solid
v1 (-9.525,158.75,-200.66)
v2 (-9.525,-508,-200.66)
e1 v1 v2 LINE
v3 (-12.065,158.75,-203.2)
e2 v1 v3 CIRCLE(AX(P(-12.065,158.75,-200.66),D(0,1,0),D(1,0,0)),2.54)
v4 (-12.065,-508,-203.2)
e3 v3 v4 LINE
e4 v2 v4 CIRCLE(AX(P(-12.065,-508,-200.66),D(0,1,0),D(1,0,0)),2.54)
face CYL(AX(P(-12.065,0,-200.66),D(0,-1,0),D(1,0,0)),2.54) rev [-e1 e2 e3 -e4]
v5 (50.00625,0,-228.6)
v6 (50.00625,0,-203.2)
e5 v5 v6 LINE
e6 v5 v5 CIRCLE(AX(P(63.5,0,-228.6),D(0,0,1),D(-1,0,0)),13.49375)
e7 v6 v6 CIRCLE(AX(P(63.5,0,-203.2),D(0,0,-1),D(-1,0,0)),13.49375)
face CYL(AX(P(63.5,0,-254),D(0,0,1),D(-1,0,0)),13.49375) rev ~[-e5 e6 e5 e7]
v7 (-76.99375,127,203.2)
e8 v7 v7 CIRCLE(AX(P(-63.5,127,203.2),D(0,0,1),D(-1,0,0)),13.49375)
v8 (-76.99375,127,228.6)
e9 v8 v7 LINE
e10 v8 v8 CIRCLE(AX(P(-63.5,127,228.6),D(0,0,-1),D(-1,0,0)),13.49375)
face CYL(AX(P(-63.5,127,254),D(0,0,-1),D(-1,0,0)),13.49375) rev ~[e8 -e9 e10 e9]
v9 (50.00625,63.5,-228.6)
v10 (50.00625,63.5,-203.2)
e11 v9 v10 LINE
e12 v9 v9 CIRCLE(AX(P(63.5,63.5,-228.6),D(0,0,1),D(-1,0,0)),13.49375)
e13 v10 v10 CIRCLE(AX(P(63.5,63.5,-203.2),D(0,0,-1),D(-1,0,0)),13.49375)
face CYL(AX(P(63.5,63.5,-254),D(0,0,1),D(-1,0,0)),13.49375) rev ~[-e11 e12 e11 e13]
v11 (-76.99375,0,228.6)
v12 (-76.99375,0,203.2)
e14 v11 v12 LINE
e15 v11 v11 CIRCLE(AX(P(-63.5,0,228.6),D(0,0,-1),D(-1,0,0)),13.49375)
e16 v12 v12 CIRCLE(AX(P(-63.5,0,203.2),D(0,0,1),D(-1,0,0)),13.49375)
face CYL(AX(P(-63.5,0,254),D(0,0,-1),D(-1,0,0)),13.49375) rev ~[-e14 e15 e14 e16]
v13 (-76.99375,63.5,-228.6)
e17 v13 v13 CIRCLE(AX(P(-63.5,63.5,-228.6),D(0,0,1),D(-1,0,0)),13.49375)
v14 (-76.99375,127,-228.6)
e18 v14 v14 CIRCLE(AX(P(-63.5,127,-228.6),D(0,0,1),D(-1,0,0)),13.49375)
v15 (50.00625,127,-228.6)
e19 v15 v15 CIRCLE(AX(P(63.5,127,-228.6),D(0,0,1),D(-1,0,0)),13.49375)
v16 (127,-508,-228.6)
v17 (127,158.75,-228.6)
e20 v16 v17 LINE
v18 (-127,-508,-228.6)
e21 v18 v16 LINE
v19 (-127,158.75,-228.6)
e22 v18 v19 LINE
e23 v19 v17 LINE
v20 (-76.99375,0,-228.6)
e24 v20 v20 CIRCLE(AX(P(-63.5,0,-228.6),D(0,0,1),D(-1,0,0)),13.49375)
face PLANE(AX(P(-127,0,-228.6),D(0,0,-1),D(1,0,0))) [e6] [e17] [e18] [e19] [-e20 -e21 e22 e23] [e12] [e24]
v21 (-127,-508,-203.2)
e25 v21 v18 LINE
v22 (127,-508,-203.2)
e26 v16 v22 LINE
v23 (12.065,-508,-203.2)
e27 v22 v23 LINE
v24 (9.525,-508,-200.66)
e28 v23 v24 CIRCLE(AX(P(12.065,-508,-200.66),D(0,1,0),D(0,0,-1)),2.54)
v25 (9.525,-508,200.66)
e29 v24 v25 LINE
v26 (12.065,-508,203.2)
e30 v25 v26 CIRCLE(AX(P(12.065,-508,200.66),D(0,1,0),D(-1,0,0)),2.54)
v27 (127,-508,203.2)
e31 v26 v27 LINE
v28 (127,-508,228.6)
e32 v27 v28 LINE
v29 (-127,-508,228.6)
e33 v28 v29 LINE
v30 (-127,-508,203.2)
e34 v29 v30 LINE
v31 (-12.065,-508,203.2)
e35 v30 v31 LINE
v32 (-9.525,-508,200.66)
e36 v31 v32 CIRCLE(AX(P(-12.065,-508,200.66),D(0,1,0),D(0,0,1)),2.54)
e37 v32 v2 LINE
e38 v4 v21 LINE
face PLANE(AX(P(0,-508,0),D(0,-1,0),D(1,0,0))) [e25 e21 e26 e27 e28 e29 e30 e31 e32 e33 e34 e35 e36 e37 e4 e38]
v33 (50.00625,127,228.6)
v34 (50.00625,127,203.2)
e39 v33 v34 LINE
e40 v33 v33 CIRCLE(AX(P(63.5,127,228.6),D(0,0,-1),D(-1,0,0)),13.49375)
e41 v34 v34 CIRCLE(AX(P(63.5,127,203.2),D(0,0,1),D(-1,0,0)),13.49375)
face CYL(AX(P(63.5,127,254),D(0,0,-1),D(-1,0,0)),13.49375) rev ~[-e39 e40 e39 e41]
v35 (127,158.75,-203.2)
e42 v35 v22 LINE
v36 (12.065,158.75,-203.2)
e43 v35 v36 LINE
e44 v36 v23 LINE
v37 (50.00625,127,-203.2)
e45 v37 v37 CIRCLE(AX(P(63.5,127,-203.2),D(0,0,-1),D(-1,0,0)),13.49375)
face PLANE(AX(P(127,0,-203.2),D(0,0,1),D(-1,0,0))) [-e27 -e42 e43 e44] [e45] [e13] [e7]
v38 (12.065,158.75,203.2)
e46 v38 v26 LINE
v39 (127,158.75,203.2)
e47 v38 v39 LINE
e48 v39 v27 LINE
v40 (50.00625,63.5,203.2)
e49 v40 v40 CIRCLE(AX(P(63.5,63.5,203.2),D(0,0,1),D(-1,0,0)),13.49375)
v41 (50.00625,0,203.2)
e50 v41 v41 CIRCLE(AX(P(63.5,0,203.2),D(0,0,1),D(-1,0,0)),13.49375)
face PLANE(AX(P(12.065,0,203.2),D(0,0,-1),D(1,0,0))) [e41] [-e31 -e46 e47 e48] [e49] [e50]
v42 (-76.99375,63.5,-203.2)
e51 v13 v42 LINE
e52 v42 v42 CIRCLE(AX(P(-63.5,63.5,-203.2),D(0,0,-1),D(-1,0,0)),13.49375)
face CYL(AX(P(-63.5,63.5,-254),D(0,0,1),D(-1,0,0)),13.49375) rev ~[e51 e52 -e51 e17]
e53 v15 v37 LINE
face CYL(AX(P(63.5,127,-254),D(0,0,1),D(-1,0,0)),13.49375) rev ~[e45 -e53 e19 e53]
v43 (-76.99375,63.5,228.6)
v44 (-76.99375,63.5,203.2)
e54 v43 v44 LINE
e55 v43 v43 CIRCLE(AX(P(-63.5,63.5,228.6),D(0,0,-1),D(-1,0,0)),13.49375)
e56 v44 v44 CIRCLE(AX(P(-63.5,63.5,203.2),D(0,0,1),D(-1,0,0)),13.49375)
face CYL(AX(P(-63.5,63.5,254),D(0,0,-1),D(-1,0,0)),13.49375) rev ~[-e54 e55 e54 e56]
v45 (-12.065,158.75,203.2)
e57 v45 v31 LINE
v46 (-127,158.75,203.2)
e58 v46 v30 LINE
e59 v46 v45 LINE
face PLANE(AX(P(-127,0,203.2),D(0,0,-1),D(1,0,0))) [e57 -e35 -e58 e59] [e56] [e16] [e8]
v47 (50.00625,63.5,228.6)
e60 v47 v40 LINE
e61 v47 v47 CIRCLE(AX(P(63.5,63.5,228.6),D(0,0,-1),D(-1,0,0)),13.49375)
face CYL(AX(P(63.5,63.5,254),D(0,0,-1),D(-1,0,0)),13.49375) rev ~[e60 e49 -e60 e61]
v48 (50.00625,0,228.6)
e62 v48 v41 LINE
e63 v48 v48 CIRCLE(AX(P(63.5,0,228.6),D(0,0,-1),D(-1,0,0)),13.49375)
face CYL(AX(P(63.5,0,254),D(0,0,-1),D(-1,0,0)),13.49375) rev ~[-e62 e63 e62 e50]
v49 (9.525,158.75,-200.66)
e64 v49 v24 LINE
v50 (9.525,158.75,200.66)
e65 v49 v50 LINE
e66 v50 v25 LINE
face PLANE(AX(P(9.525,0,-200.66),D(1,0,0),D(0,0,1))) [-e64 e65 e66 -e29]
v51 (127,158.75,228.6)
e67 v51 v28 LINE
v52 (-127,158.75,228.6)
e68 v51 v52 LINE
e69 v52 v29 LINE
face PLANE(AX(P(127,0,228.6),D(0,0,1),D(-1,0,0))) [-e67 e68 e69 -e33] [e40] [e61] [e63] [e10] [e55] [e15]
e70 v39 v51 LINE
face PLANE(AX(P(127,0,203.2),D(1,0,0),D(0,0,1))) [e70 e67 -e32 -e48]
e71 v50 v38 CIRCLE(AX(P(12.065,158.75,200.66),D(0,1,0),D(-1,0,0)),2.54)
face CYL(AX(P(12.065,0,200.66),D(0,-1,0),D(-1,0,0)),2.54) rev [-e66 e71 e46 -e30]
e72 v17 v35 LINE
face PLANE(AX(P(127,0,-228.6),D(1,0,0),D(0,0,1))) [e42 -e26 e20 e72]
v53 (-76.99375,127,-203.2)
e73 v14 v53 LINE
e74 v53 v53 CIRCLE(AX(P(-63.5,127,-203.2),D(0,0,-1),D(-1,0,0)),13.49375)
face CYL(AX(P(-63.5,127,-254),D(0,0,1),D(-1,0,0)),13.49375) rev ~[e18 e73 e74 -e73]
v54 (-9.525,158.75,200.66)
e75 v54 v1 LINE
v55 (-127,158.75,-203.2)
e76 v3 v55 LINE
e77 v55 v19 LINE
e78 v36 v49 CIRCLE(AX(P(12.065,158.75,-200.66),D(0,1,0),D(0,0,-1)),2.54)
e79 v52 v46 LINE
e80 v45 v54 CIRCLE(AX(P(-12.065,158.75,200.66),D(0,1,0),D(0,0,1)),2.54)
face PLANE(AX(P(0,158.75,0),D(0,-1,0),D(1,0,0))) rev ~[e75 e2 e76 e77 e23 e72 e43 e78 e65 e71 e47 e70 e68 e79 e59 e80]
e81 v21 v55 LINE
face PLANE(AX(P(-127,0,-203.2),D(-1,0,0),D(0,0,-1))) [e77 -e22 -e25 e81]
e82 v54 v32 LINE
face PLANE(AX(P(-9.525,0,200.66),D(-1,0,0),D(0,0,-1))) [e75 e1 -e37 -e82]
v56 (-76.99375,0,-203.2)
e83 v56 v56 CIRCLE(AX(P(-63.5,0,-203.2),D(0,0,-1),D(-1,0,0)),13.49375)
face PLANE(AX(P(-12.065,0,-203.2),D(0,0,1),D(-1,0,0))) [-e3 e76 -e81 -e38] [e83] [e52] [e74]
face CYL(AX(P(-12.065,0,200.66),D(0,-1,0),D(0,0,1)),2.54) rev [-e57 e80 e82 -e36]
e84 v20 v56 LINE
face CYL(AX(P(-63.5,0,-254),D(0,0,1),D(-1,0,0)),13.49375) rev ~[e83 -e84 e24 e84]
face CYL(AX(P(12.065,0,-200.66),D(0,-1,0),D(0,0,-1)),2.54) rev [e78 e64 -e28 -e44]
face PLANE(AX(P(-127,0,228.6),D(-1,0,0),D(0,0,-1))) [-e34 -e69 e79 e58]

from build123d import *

# Parameters (mm, degrees)
F1_DEPTH      = 508
F1_DEPTH_BACK = 158.75
F3_D          = 26.9875
F3_DEPTH      = 25.4
F3_TIP        = 8.107862978
F5_D          = 26.9875
F5_DEPTH      = 25.4
F5_TIP        = 8.107862978


# Not quite as in the source:
# - a feature names something its author has since deleted; it is built from what else it names


with BuildPart() as f1:
    # F0 (on Front) → F1 (new body, two sides)
    with BuildSketch(Plane.XZ) as f1_sk:
        with BuildLine():
            Line((127, -228.6), (127, -203.2))
            Line((127, -203.2), (12.065, -203.2))
            ThreePointArc((12.065, -203.2), (10.2689487758, -202.4560512242), (9.525, -200.66))
            Line((9.525, -200.66), (9.525, 200.66))
            ThreePointArc((9.525, 200.66), (10.2689487758, 202.4560512242), (12.065, 203.2))
            Line((12.065, 203.2), (127, 203.2))
            Line((127, 203.2), (127, 228.6))
            Line((127, 228.6), (-127, 228.6))
            Line((-127, 228.6), (-127, 203.2))
            Line((-127, 203.2), (-12.065, 203.2))
            ThreePointArc((-12.065, 203.2), (-10.2689487758, 202.4560512242), (-9.525, 200.66))
            Line((-9.525, 200.66), (-9.525, -200.66))
            ThreePointArc((-9.525, -200.66), (-10.2689487758, -202.4560512242), (-12.065, -203.2))
            Line((-12.065, -203.2), (-127, -203.2))
            Line((-127, -203.2), (-127, -228.6))
            Line((-127, -228.6), (127, -228.6))
        make_face()
    extrude(amount=F1_DEPTH)
    extrude(f1_sk.sketch, amount=-F1_DEPTH_BACK)

    # F3
    with Locations(Plane.XY.offset(228.6)):
        with Locations((63.5, 127), (63.5, 63.5), (63.5, 0), (-63.5, 0), (-63.5, 63.5), (-63.5, 127)):
            Hole(F3_D / 2, depth=F3_DEPTH)
            with Locations((0, 0, -(F3_DEPTH + F3_TIP / 2))):  # 118° drill point
                Cone(0, F3_D / 2, F3_TIP, mode=Mode.SUBTRACT)

    # F5
    with Locations(Plane(origin=(0, 0, -228.6), x_dir=(1, 0, 0), z_dir=(0, 0, -1))):
        with Locations((63.5, -127), (63.5, -63.5), (63.5, 0), (-63.5, 0), (-63.5, -63.5), (-63.5, -127)):
            Hole(F5_D / 2, depth=F5_DEPTH)
            with Locations((0, 0, -(F5_DEPTH + F5_TIP / 2))):  # 118° drill point
                Cone(0, F5_D / 2, F5_TIP, mode=Mode.SUBTRACT)


solid = f1.part
